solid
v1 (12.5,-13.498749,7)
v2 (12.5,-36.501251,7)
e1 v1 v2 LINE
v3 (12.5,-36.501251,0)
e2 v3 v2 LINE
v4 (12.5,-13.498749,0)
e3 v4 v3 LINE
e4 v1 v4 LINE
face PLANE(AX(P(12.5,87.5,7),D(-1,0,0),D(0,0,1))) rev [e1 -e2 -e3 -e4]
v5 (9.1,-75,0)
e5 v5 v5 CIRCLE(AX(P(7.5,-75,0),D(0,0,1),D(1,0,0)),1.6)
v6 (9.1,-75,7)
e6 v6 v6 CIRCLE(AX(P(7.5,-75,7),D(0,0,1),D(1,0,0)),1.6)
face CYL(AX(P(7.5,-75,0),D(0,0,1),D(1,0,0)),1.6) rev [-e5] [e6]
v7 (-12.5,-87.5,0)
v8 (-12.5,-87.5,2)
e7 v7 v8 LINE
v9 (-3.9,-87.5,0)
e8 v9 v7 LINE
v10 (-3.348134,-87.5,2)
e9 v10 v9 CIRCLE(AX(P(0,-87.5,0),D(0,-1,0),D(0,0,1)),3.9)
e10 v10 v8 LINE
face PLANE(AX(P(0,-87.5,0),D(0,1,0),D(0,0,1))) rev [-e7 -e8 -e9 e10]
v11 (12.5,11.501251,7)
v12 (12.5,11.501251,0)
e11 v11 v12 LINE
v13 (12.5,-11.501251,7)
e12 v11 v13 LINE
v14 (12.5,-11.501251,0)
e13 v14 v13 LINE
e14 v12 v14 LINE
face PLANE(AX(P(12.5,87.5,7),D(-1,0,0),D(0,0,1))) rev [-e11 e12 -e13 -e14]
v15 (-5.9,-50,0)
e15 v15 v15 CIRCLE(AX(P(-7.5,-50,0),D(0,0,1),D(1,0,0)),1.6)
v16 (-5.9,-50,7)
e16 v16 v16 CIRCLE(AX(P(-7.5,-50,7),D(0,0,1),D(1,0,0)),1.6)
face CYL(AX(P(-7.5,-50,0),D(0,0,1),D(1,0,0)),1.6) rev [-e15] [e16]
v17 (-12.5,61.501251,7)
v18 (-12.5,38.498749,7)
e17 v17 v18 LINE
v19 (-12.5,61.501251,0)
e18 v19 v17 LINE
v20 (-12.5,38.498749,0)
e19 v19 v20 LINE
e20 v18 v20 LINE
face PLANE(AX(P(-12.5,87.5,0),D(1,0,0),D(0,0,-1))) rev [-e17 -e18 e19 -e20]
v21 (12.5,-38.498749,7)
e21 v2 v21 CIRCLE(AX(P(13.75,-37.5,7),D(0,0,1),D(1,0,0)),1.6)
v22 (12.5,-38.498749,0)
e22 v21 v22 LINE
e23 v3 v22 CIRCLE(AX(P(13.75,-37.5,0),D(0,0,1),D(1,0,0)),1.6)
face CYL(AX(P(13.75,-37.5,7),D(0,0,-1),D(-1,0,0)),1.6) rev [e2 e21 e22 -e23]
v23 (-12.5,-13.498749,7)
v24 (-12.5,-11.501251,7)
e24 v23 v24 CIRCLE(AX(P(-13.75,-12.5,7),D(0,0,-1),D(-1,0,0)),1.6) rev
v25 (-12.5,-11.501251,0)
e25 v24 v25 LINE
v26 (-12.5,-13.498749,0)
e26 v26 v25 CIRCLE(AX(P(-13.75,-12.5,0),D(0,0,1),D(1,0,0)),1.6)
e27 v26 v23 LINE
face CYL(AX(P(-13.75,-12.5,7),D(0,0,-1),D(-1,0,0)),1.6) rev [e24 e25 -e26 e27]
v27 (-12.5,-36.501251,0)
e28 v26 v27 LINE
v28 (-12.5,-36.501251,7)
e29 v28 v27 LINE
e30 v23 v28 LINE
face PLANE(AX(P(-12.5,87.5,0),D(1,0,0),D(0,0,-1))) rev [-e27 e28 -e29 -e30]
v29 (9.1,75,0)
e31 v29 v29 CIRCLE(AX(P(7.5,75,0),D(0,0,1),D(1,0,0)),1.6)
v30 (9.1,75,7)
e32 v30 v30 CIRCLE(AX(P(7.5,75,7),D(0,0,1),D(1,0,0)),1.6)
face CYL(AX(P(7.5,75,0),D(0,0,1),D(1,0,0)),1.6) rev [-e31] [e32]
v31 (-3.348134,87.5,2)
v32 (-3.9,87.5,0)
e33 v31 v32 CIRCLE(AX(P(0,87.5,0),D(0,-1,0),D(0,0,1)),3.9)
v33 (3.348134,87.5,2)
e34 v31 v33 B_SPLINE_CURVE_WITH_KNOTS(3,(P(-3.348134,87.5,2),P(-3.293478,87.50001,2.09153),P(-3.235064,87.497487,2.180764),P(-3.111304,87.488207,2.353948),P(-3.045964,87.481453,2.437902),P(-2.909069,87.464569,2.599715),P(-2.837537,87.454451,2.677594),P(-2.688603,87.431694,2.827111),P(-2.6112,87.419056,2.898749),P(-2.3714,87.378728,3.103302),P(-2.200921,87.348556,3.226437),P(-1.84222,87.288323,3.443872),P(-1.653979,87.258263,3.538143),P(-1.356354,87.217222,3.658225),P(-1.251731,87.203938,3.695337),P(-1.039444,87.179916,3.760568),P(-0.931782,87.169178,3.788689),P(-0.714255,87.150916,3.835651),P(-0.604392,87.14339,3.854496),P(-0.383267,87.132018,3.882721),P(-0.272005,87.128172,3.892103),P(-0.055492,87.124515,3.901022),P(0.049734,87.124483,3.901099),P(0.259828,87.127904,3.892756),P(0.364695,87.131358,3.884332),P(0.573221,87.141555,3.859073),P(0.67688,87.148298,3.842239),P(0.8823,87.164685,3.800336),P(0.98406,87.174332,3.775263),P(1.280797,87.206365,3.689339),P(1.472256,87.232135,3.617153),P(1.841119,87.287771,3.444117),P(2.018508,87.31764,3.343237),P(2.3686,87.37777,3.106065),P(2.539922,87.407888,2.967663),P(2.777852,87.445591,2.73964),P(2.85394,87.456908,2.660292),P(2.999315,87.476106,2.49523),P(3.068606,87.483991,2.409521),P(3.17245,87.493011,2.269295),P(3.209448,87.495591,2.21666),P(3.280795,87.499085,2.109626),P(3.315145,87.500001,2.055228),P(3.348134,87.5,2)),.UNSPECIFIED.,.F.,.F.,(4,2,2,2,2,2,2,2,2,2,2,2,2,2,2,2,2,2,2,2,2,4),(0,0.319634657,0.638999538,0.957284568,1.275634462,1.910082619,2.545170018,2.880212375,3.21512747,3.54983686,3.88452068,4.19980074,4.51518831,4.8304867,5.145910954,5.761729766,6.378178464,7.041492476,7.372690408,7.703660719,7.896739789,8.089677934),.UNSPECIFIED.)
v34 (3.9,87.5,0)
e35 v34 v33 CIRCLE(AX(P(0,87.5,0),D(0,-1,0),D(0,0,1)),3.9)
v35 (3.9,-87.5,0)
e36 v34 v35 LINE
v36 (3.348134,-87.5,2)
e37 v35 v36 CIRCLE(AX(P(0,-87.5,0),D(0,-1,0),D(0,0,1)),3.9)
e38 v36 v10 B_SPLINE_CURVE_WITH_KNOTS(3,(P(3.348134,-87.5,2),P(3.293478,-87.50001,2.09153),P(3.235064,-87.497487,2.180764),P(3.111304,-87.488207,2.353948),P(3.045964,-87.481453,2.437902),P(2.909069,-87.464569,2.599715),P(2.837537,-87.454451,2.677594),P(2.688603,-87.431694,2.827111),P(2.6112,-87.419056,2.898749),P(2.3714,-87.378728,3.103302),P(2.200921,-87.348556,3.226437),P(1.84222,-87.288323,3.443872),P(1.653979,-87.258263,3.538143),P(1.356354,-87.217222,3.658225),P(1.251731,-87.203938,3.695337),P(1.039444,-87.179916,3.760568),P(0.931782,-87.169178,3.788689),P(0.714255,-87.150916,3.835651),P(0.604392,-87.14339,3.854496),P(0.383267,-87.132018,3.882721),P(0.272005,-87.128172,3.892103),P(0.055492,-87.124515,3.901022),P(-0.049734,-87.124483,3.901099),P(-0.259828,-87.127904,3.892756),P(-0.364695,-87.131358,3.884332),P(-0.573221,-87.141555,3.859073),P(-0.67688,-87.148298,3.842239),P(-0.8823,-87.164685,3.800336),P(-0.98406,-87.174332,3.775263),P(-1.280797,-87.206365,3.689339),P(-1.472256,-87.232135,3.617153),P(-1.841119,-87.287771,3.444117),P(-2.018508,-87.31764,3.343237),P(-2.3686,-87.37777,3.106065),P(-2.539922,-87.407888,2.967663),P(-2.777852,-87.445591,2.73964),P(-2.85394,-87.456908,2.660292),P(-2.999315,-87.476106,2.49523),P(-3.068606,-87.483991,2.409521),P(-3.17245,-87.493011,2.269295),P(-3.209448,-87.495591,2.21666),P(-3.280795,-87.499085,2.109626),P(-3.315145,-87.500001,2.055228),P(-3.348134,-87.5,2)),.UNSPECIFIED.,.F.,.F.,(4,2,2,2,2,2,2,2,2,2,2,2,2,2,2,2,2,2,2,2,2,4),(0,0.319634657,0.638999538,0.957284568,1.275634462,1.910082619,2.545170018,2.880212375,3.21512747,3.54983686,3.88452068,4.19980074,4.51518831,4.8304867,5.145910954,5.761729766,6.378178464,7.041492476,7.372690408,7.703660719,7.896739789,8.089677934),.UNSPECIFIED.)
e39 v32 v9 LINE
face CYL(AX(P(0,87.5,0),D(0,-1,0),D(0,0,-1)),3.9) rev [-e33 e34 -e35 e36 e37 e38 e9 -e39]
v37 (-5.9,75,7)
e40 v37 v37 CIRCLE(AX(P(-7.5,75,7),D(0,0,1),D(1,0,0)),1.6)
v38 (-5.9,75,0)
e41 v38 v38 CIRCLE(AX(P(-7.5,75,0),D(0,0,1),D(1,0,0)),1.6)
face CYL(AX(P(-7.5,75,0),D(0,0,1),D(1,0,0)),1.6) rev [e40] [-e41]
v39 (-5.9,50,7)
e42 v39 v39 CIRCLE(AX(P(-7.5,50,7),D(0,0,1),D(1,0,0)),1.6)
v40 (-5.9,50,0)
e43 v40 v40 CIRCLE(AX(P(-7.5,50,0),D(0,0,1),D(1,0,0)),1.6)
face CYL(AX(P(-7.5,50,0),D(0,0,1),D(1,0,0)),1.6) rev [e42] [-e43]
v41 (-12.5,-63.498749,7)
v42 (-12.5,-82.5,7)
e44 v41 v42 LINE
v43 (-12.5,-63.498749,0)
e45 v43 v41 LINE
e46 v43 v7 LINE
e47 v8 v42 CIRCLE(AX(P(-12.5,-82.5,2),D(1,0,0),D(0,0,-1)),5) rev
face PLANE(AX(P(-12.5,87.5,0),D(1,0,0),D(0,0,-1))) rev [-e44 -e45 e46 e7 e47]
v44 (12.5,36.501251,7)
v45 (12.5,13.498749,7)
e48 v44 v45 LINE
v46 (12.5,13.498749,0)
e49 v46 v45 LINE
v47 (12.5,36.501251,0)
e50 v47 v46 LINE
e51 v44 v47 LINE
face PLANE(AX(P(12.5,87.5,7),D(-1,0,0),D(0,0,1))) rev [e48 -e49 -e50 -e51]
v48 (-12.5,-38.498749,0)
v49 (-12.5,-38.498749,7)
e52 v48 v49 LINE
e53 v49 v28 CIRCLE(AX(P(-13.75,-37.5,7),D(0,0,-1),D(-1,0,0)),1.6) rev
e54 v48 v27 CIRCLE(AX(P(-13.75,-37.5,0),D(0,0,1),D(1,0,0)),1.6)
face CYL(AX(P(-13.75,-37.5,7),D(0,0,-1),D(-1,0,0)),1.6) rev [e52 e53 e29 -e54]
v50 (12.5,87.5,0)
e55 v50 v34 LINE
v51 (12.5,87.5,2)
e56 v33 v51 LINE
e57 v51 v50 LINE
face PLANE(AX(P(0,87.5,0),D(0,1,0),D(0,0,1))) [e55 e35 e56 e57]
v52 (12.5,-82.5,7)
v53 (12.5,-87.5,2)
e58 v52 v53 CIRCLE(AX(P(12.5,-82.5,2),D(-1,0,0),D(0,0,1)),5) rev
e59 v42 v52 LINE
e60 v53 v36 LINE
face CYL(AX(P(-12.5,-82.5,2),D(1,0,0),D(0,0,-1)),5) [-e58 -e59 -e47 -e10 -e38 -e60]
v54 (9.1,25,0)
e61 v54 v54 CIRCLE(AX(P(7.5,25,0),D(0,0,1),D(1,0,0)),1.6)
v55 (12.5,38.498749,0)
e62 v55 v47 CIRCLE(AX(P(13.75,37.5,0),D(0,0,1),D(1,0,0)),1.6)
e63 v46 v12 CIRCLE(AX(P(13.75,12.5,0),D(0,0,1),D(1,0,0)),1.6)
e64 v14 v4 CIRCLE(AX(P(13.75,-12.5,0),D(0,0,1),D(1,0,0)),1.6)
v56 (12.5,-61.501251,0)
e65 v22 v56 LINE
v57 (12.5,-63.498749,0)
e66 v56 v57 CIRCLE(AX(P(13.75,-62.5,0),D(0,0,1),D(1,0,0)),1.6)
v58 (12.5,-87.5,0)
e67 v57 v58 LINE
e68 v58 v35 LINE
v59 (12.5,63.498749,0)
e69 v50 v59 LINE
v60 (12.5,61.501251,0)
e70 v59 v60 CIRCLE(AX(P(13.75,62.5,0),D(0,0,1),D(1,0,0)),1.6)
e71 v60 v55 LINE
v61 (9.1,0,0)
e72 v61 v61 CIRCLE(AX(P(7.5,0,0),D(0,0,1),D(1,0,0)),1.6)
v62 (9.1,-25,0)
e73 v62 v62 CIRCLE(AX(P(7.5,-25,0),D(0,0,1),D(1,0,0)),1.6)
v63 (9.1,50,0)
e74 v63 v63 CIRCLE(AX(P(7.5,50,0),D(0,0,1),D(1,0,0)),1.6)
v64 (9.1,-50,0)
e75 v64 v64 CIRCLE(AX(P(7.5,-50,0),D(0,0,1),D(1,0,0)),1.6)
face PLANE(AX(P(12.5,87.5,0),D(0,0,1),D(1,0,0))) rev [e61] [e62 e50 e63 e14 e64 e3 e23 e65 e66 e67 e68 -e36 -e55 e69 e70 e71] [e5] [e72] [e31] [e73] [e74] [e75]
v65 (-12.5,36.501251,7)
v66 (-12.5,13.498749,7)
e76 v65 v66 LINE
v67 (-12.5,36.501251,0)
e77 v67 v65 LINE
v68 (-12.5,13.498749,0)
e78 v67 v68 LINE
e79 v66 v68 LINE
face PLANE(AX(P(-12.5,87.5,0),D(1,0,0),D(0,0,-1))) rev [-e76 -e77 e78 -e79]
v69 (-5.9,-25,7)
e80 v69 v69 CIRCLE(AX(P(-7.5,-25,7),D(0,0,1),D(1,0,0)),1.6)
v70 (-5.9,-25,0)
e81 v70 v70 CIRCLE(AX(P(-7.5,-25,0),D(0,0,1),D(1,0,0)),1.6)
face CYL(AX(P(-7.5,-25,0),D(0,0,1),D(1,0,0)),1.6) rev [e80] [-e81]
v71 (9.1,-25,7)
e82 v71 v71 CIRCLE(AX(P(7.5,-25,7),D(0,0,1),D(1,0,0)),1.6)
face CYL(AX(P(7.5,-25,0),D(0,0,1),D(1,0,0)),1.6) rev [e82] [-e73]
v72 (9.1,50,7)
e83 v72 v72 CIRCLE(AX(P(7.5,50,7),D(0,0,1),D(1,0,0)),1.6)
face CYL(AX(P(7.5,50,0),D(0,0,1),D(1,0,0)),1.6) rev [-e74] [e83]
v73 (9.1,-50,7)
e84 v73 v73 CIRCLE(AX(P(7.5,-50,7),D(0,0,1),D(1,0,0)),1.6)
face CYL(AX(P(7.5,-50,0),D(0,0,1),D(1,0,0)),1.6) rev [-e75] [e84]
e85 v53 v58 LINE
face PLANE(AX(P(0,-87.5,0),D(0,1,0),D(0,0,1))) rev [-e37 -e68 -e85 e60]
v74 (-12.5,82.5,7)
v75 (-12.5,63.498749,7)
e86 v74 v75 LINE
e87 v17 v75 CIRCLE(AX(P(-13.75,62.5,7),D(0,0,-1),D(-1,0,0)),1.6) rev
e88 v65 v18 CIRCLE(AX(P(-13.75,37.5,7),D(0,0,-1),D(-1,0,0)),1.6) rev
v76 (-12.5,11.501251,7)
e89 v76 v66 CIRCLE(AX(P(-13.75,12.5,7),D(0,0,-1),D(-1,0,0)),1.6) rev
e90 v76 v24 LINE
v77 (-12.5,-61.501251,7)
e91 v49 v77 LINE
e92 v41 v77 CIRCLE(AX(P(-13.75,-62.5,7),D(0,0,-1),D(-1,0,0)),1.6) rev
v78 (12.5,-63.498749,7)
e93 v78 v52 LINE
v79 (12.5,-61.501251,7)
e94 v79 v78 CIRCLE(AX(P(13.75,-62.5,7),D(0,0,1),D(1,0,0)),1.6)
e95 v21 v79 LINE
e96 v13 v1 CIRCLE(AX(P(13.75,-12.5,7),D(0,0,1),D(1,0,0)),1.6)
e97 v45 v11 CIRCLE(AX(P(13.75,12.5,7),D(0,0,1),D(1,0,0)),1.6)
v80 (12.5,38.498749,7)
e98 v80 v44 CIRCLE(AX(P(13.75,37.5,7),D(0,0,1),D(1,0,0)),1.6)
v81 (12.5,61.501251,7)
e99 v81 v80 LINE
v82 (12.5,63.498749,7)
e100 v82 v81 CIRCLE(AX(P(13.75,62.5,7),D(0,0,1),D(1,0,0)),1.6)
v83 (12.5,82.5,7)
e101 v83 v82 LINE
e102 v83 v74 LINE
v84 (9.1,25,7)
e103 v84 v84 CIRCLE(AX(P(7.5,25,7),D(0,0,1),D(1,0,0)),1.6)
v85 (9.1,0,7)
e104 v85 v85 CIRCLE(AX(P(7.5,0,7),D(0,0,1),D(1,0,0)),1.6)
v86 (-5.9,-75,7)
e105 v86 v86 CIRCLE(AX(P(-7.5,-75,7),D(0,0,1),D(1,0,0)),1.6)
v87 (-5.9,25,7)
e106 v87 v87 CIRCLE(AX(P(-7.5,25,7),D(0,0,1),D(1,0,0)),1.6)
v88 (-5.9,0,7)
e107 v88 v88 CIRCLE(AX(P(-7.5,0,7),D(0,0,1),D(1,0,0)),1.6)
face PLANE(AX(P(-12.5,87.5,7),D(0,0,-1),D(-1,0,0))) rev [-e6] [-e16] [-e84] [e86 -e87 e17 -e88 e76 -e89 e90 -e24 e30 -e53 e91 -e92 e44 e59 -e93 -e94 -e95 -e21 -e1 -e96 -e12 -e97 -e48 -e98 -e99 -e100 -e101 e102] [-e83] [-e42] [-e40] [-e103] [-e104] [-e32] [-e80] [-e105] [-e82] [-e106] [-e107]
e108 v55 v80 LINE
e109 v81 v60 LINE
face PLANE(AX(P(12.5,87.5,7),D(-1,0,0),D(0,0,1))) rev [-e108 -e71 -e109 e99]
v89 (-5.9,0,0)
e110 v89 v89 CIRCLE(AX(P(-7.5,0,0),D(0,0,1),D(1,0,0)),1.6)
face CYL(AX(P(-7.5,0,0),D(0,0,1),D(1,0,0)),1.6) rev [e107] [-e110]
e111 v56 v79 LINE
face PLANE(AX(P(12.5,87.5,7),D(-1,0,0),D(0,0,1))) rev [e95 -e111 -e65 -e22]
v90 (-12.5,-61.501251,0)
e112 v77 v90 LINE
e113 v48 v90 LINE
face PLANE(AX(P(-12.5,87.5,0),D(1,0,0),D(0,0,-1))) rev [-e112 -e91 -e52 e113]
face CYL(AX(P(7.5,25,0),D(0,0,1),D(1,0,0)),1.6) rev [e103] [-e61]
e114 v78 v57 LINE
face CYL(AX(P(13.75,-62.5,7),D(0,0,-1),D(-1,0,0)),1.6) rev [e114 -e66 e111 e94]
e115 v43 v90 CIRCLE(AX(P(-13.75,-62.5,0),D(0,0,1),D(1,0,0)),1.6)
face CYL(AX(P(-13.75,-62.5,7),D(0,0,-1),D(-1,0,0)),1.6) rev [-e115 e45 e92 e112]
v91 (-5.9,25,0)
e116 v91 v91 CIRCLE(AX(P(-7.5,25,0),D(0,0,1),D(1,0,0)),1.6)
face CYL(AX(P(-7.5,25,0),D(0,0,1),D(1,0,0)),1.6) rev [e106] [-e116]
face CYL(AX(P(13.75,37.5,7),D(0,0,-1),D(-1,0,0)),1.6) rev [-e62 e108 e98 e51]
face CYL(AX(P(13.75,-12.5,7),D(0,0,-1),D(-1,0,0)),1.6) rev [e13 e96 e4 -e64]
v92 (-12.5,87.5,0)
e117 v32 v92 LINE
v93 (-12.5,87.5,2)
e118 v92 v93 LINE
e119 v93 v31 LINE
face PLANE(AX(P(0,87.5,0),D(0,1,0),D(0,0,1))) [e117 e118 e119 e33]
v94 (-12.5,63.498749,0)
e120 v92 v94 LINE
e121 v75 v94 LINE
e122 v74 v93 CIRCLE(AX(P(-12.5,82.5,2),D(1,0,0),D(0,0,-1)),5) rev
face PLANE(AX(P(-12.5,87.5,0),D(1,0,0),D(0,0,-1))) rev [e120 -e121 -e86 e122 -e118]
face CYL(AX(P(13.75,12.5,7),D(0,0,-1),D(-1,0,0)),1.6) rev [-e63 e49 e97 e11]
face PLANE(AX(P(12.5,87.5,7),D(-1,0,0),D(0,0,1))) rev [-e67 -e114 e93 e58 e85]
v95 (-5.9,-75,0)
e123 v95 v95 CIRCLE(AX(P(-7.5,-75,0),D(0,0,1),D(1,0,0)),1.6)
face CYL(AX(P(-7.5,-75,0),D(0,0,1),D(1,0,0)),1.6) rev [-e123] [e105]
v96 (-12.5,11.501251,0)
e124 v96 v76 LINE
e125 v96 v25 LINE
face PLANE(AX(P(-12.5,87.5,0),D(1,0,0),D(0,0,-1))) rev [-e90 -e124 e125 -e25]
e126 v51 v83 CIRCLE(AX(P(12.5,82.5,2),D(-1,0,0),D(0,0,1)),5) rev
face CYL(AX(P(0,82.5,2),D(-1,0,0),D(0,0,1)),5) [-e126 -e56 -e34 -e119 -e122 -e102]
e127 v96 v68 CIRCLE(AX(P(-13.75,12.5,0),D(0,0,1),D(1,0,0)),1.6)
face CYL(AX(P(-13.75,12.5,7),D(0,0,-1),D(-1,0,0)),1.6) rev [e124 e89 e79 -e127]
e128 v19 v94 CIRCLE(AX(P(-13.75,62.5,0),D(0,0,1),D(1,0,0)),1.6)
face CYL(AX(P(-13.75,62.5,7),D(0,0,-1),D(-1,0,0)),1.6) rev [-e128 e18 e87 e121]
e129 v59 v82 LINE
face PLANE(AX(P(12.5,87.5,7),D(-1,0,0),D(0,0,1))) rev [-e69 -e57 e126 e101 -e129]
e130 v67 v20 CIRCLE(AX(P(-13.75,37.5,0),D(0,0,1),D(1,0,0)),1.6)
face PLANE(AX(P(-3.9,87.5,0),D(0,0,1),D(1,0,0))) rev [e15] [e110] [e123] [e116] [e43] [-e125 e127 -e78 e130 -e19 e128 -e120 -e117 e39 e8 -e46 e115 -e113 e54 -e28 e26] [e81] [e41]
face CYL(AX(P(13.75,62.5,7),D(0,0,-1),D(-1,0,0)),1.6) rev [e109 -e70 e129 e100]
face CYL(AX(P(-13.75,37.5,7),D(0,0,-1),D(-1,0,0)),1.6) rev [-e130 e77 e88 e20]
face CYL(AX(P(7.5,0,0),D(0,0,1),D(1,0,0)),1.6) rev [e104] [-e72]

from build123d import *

# Parameters (mm, degrees)
EXTRUDE_1_DEPTH             = 87.5
SKETCH_4_R                  = 1.6
CUT_EXTRUDE_3_DEPTH         = 89.665100237
PATTERN_LINEAR_2_COUNT      = 6
PATTERN_LINEAR_2_PITCH      = 25
FILLET_1_R                  = 5
SKETCH_5_R                  = 1.6
CUT_EXTRUDE_4_DEPTH         = 89.665100357
PATTERN_LINEAR_3_COUNT      = 2
PATTERN_LINEAR_3_PITCH      = 15
PATTERN_LINEAR_3_COUNT_DIR2 = 7
PATTERN_LINEAR_3_PITCH_DIR2 = 25


with BuildPart() as part:
    # 草图2 → 凸台-拉伸1 (new, symmetric)
    with BuildSketch(Plane(origin=(0, 0, 0), x_dir=(1, 0, 0), z_dir=(0, 1, 0))):
        with BuildLine():
            Line((-3.9, 0), (-12.5, 0))
            Line((-12.5, 0), (-12.5, -7))
            Line((-12.5, -7), (12.5, -7))
            Line((12.5, -7), (12.5, 0))
            Line((12.5, 0), (3.9, 0))
            ThreePointArc((3.9, 0), (0, -3.9), (-3.9, 0))
        make_face()
    extrude(amount=EXTRUDE_1_DEPTH, both=True)

    # 草图4 → 切除-拉伸3 (cut, through all)
    with BuildSketch(Plane.XY):
        with Locations((-13.75, 62.5)):
            Circle(SKETCH_4_R)
        with Locations((13.75, 62.5)):
            Circle(SKETCH_4_R)
    cut_extrude_3 = extrude(amount=CUT_EXTRUDE_3_DEPTH, mode=Mode.SUBTRACT)

    # 阵列(线性)2: 切除-拉伸3 ×6
    with Locations(*[(0, -i * PATTERN_LINEAR_2_PITCH, 0) for i in range(1, PATTERN_LINEAR_2_COUNT)]):
        add(cut_extrude_3, mode=Mode.SUBTRACT)

    # 圆角1
    # the kernel refuses this fillet: 5 mm, written as the material it takes off along each edge
    with BuildSketch(Plane(origin=(-25, 87.5, 7), x_dir=(0, -1, 0), z_dir=(1, 0, 0))) as fillet_1_piece_1:
        with BuildLine():
            CenterArc((FILLET_1_R, FILLET_1_R), FILLET_1_R, 180, 90)
            Line((0, FILLET_1_R), (0, 0))
            Line((0, 0), (FILLET_1_R, 0))
        make_face()
    extrude(amount=50, mode=Mode.SUBTRACT)
    with BuildSketch(Plane(origin=(-25, -87.5, 7), x_dir=(0, 1, 0), z_dir=(1, 0, 0))) as fillet_1_piece_2:
        with BuildLine():
            CenterArc((FILLET_1_R, -FILLET_1_R), FILLET_1_R, 90, 90)
            Line((0, -FILLET_1_R), (0, 0))
            Line((0, 0), (FILLET_1_R, 0))
        make_face()
    extrude(amount=50, mode=Mode.SUBTRACT)

    # 草图5 → 切除-拉伸4 (cut, through all)
    with BuildSketch(Plane.XY.offset(7)):
        with Locations((-7.5, 75)):
            Circle(SKETCH_5_R)
    cut_extrude_4 = extrude(amount=-CUT_EXTRUDE_4_DEPTH, mode=Mode.SUBTRACT)

    # 阵列(线性)3: Cut-Extrude 4 2 × 7
    with Locations(*[(i * PATTERN_LINEAR_3_PITCH, -j * PATTERN_LINEAR_3_PITCH_DIR2, 0) for i in range(PATTERN_LINEAR_3_COUNT) for j in range(PATTERN_LINEAR_3_COUNT_DIR2) if (i, j) != (0, 0)]):
        add(cut_extrude_4, mode=Mode.SUBTRACT)


solid = part.part
